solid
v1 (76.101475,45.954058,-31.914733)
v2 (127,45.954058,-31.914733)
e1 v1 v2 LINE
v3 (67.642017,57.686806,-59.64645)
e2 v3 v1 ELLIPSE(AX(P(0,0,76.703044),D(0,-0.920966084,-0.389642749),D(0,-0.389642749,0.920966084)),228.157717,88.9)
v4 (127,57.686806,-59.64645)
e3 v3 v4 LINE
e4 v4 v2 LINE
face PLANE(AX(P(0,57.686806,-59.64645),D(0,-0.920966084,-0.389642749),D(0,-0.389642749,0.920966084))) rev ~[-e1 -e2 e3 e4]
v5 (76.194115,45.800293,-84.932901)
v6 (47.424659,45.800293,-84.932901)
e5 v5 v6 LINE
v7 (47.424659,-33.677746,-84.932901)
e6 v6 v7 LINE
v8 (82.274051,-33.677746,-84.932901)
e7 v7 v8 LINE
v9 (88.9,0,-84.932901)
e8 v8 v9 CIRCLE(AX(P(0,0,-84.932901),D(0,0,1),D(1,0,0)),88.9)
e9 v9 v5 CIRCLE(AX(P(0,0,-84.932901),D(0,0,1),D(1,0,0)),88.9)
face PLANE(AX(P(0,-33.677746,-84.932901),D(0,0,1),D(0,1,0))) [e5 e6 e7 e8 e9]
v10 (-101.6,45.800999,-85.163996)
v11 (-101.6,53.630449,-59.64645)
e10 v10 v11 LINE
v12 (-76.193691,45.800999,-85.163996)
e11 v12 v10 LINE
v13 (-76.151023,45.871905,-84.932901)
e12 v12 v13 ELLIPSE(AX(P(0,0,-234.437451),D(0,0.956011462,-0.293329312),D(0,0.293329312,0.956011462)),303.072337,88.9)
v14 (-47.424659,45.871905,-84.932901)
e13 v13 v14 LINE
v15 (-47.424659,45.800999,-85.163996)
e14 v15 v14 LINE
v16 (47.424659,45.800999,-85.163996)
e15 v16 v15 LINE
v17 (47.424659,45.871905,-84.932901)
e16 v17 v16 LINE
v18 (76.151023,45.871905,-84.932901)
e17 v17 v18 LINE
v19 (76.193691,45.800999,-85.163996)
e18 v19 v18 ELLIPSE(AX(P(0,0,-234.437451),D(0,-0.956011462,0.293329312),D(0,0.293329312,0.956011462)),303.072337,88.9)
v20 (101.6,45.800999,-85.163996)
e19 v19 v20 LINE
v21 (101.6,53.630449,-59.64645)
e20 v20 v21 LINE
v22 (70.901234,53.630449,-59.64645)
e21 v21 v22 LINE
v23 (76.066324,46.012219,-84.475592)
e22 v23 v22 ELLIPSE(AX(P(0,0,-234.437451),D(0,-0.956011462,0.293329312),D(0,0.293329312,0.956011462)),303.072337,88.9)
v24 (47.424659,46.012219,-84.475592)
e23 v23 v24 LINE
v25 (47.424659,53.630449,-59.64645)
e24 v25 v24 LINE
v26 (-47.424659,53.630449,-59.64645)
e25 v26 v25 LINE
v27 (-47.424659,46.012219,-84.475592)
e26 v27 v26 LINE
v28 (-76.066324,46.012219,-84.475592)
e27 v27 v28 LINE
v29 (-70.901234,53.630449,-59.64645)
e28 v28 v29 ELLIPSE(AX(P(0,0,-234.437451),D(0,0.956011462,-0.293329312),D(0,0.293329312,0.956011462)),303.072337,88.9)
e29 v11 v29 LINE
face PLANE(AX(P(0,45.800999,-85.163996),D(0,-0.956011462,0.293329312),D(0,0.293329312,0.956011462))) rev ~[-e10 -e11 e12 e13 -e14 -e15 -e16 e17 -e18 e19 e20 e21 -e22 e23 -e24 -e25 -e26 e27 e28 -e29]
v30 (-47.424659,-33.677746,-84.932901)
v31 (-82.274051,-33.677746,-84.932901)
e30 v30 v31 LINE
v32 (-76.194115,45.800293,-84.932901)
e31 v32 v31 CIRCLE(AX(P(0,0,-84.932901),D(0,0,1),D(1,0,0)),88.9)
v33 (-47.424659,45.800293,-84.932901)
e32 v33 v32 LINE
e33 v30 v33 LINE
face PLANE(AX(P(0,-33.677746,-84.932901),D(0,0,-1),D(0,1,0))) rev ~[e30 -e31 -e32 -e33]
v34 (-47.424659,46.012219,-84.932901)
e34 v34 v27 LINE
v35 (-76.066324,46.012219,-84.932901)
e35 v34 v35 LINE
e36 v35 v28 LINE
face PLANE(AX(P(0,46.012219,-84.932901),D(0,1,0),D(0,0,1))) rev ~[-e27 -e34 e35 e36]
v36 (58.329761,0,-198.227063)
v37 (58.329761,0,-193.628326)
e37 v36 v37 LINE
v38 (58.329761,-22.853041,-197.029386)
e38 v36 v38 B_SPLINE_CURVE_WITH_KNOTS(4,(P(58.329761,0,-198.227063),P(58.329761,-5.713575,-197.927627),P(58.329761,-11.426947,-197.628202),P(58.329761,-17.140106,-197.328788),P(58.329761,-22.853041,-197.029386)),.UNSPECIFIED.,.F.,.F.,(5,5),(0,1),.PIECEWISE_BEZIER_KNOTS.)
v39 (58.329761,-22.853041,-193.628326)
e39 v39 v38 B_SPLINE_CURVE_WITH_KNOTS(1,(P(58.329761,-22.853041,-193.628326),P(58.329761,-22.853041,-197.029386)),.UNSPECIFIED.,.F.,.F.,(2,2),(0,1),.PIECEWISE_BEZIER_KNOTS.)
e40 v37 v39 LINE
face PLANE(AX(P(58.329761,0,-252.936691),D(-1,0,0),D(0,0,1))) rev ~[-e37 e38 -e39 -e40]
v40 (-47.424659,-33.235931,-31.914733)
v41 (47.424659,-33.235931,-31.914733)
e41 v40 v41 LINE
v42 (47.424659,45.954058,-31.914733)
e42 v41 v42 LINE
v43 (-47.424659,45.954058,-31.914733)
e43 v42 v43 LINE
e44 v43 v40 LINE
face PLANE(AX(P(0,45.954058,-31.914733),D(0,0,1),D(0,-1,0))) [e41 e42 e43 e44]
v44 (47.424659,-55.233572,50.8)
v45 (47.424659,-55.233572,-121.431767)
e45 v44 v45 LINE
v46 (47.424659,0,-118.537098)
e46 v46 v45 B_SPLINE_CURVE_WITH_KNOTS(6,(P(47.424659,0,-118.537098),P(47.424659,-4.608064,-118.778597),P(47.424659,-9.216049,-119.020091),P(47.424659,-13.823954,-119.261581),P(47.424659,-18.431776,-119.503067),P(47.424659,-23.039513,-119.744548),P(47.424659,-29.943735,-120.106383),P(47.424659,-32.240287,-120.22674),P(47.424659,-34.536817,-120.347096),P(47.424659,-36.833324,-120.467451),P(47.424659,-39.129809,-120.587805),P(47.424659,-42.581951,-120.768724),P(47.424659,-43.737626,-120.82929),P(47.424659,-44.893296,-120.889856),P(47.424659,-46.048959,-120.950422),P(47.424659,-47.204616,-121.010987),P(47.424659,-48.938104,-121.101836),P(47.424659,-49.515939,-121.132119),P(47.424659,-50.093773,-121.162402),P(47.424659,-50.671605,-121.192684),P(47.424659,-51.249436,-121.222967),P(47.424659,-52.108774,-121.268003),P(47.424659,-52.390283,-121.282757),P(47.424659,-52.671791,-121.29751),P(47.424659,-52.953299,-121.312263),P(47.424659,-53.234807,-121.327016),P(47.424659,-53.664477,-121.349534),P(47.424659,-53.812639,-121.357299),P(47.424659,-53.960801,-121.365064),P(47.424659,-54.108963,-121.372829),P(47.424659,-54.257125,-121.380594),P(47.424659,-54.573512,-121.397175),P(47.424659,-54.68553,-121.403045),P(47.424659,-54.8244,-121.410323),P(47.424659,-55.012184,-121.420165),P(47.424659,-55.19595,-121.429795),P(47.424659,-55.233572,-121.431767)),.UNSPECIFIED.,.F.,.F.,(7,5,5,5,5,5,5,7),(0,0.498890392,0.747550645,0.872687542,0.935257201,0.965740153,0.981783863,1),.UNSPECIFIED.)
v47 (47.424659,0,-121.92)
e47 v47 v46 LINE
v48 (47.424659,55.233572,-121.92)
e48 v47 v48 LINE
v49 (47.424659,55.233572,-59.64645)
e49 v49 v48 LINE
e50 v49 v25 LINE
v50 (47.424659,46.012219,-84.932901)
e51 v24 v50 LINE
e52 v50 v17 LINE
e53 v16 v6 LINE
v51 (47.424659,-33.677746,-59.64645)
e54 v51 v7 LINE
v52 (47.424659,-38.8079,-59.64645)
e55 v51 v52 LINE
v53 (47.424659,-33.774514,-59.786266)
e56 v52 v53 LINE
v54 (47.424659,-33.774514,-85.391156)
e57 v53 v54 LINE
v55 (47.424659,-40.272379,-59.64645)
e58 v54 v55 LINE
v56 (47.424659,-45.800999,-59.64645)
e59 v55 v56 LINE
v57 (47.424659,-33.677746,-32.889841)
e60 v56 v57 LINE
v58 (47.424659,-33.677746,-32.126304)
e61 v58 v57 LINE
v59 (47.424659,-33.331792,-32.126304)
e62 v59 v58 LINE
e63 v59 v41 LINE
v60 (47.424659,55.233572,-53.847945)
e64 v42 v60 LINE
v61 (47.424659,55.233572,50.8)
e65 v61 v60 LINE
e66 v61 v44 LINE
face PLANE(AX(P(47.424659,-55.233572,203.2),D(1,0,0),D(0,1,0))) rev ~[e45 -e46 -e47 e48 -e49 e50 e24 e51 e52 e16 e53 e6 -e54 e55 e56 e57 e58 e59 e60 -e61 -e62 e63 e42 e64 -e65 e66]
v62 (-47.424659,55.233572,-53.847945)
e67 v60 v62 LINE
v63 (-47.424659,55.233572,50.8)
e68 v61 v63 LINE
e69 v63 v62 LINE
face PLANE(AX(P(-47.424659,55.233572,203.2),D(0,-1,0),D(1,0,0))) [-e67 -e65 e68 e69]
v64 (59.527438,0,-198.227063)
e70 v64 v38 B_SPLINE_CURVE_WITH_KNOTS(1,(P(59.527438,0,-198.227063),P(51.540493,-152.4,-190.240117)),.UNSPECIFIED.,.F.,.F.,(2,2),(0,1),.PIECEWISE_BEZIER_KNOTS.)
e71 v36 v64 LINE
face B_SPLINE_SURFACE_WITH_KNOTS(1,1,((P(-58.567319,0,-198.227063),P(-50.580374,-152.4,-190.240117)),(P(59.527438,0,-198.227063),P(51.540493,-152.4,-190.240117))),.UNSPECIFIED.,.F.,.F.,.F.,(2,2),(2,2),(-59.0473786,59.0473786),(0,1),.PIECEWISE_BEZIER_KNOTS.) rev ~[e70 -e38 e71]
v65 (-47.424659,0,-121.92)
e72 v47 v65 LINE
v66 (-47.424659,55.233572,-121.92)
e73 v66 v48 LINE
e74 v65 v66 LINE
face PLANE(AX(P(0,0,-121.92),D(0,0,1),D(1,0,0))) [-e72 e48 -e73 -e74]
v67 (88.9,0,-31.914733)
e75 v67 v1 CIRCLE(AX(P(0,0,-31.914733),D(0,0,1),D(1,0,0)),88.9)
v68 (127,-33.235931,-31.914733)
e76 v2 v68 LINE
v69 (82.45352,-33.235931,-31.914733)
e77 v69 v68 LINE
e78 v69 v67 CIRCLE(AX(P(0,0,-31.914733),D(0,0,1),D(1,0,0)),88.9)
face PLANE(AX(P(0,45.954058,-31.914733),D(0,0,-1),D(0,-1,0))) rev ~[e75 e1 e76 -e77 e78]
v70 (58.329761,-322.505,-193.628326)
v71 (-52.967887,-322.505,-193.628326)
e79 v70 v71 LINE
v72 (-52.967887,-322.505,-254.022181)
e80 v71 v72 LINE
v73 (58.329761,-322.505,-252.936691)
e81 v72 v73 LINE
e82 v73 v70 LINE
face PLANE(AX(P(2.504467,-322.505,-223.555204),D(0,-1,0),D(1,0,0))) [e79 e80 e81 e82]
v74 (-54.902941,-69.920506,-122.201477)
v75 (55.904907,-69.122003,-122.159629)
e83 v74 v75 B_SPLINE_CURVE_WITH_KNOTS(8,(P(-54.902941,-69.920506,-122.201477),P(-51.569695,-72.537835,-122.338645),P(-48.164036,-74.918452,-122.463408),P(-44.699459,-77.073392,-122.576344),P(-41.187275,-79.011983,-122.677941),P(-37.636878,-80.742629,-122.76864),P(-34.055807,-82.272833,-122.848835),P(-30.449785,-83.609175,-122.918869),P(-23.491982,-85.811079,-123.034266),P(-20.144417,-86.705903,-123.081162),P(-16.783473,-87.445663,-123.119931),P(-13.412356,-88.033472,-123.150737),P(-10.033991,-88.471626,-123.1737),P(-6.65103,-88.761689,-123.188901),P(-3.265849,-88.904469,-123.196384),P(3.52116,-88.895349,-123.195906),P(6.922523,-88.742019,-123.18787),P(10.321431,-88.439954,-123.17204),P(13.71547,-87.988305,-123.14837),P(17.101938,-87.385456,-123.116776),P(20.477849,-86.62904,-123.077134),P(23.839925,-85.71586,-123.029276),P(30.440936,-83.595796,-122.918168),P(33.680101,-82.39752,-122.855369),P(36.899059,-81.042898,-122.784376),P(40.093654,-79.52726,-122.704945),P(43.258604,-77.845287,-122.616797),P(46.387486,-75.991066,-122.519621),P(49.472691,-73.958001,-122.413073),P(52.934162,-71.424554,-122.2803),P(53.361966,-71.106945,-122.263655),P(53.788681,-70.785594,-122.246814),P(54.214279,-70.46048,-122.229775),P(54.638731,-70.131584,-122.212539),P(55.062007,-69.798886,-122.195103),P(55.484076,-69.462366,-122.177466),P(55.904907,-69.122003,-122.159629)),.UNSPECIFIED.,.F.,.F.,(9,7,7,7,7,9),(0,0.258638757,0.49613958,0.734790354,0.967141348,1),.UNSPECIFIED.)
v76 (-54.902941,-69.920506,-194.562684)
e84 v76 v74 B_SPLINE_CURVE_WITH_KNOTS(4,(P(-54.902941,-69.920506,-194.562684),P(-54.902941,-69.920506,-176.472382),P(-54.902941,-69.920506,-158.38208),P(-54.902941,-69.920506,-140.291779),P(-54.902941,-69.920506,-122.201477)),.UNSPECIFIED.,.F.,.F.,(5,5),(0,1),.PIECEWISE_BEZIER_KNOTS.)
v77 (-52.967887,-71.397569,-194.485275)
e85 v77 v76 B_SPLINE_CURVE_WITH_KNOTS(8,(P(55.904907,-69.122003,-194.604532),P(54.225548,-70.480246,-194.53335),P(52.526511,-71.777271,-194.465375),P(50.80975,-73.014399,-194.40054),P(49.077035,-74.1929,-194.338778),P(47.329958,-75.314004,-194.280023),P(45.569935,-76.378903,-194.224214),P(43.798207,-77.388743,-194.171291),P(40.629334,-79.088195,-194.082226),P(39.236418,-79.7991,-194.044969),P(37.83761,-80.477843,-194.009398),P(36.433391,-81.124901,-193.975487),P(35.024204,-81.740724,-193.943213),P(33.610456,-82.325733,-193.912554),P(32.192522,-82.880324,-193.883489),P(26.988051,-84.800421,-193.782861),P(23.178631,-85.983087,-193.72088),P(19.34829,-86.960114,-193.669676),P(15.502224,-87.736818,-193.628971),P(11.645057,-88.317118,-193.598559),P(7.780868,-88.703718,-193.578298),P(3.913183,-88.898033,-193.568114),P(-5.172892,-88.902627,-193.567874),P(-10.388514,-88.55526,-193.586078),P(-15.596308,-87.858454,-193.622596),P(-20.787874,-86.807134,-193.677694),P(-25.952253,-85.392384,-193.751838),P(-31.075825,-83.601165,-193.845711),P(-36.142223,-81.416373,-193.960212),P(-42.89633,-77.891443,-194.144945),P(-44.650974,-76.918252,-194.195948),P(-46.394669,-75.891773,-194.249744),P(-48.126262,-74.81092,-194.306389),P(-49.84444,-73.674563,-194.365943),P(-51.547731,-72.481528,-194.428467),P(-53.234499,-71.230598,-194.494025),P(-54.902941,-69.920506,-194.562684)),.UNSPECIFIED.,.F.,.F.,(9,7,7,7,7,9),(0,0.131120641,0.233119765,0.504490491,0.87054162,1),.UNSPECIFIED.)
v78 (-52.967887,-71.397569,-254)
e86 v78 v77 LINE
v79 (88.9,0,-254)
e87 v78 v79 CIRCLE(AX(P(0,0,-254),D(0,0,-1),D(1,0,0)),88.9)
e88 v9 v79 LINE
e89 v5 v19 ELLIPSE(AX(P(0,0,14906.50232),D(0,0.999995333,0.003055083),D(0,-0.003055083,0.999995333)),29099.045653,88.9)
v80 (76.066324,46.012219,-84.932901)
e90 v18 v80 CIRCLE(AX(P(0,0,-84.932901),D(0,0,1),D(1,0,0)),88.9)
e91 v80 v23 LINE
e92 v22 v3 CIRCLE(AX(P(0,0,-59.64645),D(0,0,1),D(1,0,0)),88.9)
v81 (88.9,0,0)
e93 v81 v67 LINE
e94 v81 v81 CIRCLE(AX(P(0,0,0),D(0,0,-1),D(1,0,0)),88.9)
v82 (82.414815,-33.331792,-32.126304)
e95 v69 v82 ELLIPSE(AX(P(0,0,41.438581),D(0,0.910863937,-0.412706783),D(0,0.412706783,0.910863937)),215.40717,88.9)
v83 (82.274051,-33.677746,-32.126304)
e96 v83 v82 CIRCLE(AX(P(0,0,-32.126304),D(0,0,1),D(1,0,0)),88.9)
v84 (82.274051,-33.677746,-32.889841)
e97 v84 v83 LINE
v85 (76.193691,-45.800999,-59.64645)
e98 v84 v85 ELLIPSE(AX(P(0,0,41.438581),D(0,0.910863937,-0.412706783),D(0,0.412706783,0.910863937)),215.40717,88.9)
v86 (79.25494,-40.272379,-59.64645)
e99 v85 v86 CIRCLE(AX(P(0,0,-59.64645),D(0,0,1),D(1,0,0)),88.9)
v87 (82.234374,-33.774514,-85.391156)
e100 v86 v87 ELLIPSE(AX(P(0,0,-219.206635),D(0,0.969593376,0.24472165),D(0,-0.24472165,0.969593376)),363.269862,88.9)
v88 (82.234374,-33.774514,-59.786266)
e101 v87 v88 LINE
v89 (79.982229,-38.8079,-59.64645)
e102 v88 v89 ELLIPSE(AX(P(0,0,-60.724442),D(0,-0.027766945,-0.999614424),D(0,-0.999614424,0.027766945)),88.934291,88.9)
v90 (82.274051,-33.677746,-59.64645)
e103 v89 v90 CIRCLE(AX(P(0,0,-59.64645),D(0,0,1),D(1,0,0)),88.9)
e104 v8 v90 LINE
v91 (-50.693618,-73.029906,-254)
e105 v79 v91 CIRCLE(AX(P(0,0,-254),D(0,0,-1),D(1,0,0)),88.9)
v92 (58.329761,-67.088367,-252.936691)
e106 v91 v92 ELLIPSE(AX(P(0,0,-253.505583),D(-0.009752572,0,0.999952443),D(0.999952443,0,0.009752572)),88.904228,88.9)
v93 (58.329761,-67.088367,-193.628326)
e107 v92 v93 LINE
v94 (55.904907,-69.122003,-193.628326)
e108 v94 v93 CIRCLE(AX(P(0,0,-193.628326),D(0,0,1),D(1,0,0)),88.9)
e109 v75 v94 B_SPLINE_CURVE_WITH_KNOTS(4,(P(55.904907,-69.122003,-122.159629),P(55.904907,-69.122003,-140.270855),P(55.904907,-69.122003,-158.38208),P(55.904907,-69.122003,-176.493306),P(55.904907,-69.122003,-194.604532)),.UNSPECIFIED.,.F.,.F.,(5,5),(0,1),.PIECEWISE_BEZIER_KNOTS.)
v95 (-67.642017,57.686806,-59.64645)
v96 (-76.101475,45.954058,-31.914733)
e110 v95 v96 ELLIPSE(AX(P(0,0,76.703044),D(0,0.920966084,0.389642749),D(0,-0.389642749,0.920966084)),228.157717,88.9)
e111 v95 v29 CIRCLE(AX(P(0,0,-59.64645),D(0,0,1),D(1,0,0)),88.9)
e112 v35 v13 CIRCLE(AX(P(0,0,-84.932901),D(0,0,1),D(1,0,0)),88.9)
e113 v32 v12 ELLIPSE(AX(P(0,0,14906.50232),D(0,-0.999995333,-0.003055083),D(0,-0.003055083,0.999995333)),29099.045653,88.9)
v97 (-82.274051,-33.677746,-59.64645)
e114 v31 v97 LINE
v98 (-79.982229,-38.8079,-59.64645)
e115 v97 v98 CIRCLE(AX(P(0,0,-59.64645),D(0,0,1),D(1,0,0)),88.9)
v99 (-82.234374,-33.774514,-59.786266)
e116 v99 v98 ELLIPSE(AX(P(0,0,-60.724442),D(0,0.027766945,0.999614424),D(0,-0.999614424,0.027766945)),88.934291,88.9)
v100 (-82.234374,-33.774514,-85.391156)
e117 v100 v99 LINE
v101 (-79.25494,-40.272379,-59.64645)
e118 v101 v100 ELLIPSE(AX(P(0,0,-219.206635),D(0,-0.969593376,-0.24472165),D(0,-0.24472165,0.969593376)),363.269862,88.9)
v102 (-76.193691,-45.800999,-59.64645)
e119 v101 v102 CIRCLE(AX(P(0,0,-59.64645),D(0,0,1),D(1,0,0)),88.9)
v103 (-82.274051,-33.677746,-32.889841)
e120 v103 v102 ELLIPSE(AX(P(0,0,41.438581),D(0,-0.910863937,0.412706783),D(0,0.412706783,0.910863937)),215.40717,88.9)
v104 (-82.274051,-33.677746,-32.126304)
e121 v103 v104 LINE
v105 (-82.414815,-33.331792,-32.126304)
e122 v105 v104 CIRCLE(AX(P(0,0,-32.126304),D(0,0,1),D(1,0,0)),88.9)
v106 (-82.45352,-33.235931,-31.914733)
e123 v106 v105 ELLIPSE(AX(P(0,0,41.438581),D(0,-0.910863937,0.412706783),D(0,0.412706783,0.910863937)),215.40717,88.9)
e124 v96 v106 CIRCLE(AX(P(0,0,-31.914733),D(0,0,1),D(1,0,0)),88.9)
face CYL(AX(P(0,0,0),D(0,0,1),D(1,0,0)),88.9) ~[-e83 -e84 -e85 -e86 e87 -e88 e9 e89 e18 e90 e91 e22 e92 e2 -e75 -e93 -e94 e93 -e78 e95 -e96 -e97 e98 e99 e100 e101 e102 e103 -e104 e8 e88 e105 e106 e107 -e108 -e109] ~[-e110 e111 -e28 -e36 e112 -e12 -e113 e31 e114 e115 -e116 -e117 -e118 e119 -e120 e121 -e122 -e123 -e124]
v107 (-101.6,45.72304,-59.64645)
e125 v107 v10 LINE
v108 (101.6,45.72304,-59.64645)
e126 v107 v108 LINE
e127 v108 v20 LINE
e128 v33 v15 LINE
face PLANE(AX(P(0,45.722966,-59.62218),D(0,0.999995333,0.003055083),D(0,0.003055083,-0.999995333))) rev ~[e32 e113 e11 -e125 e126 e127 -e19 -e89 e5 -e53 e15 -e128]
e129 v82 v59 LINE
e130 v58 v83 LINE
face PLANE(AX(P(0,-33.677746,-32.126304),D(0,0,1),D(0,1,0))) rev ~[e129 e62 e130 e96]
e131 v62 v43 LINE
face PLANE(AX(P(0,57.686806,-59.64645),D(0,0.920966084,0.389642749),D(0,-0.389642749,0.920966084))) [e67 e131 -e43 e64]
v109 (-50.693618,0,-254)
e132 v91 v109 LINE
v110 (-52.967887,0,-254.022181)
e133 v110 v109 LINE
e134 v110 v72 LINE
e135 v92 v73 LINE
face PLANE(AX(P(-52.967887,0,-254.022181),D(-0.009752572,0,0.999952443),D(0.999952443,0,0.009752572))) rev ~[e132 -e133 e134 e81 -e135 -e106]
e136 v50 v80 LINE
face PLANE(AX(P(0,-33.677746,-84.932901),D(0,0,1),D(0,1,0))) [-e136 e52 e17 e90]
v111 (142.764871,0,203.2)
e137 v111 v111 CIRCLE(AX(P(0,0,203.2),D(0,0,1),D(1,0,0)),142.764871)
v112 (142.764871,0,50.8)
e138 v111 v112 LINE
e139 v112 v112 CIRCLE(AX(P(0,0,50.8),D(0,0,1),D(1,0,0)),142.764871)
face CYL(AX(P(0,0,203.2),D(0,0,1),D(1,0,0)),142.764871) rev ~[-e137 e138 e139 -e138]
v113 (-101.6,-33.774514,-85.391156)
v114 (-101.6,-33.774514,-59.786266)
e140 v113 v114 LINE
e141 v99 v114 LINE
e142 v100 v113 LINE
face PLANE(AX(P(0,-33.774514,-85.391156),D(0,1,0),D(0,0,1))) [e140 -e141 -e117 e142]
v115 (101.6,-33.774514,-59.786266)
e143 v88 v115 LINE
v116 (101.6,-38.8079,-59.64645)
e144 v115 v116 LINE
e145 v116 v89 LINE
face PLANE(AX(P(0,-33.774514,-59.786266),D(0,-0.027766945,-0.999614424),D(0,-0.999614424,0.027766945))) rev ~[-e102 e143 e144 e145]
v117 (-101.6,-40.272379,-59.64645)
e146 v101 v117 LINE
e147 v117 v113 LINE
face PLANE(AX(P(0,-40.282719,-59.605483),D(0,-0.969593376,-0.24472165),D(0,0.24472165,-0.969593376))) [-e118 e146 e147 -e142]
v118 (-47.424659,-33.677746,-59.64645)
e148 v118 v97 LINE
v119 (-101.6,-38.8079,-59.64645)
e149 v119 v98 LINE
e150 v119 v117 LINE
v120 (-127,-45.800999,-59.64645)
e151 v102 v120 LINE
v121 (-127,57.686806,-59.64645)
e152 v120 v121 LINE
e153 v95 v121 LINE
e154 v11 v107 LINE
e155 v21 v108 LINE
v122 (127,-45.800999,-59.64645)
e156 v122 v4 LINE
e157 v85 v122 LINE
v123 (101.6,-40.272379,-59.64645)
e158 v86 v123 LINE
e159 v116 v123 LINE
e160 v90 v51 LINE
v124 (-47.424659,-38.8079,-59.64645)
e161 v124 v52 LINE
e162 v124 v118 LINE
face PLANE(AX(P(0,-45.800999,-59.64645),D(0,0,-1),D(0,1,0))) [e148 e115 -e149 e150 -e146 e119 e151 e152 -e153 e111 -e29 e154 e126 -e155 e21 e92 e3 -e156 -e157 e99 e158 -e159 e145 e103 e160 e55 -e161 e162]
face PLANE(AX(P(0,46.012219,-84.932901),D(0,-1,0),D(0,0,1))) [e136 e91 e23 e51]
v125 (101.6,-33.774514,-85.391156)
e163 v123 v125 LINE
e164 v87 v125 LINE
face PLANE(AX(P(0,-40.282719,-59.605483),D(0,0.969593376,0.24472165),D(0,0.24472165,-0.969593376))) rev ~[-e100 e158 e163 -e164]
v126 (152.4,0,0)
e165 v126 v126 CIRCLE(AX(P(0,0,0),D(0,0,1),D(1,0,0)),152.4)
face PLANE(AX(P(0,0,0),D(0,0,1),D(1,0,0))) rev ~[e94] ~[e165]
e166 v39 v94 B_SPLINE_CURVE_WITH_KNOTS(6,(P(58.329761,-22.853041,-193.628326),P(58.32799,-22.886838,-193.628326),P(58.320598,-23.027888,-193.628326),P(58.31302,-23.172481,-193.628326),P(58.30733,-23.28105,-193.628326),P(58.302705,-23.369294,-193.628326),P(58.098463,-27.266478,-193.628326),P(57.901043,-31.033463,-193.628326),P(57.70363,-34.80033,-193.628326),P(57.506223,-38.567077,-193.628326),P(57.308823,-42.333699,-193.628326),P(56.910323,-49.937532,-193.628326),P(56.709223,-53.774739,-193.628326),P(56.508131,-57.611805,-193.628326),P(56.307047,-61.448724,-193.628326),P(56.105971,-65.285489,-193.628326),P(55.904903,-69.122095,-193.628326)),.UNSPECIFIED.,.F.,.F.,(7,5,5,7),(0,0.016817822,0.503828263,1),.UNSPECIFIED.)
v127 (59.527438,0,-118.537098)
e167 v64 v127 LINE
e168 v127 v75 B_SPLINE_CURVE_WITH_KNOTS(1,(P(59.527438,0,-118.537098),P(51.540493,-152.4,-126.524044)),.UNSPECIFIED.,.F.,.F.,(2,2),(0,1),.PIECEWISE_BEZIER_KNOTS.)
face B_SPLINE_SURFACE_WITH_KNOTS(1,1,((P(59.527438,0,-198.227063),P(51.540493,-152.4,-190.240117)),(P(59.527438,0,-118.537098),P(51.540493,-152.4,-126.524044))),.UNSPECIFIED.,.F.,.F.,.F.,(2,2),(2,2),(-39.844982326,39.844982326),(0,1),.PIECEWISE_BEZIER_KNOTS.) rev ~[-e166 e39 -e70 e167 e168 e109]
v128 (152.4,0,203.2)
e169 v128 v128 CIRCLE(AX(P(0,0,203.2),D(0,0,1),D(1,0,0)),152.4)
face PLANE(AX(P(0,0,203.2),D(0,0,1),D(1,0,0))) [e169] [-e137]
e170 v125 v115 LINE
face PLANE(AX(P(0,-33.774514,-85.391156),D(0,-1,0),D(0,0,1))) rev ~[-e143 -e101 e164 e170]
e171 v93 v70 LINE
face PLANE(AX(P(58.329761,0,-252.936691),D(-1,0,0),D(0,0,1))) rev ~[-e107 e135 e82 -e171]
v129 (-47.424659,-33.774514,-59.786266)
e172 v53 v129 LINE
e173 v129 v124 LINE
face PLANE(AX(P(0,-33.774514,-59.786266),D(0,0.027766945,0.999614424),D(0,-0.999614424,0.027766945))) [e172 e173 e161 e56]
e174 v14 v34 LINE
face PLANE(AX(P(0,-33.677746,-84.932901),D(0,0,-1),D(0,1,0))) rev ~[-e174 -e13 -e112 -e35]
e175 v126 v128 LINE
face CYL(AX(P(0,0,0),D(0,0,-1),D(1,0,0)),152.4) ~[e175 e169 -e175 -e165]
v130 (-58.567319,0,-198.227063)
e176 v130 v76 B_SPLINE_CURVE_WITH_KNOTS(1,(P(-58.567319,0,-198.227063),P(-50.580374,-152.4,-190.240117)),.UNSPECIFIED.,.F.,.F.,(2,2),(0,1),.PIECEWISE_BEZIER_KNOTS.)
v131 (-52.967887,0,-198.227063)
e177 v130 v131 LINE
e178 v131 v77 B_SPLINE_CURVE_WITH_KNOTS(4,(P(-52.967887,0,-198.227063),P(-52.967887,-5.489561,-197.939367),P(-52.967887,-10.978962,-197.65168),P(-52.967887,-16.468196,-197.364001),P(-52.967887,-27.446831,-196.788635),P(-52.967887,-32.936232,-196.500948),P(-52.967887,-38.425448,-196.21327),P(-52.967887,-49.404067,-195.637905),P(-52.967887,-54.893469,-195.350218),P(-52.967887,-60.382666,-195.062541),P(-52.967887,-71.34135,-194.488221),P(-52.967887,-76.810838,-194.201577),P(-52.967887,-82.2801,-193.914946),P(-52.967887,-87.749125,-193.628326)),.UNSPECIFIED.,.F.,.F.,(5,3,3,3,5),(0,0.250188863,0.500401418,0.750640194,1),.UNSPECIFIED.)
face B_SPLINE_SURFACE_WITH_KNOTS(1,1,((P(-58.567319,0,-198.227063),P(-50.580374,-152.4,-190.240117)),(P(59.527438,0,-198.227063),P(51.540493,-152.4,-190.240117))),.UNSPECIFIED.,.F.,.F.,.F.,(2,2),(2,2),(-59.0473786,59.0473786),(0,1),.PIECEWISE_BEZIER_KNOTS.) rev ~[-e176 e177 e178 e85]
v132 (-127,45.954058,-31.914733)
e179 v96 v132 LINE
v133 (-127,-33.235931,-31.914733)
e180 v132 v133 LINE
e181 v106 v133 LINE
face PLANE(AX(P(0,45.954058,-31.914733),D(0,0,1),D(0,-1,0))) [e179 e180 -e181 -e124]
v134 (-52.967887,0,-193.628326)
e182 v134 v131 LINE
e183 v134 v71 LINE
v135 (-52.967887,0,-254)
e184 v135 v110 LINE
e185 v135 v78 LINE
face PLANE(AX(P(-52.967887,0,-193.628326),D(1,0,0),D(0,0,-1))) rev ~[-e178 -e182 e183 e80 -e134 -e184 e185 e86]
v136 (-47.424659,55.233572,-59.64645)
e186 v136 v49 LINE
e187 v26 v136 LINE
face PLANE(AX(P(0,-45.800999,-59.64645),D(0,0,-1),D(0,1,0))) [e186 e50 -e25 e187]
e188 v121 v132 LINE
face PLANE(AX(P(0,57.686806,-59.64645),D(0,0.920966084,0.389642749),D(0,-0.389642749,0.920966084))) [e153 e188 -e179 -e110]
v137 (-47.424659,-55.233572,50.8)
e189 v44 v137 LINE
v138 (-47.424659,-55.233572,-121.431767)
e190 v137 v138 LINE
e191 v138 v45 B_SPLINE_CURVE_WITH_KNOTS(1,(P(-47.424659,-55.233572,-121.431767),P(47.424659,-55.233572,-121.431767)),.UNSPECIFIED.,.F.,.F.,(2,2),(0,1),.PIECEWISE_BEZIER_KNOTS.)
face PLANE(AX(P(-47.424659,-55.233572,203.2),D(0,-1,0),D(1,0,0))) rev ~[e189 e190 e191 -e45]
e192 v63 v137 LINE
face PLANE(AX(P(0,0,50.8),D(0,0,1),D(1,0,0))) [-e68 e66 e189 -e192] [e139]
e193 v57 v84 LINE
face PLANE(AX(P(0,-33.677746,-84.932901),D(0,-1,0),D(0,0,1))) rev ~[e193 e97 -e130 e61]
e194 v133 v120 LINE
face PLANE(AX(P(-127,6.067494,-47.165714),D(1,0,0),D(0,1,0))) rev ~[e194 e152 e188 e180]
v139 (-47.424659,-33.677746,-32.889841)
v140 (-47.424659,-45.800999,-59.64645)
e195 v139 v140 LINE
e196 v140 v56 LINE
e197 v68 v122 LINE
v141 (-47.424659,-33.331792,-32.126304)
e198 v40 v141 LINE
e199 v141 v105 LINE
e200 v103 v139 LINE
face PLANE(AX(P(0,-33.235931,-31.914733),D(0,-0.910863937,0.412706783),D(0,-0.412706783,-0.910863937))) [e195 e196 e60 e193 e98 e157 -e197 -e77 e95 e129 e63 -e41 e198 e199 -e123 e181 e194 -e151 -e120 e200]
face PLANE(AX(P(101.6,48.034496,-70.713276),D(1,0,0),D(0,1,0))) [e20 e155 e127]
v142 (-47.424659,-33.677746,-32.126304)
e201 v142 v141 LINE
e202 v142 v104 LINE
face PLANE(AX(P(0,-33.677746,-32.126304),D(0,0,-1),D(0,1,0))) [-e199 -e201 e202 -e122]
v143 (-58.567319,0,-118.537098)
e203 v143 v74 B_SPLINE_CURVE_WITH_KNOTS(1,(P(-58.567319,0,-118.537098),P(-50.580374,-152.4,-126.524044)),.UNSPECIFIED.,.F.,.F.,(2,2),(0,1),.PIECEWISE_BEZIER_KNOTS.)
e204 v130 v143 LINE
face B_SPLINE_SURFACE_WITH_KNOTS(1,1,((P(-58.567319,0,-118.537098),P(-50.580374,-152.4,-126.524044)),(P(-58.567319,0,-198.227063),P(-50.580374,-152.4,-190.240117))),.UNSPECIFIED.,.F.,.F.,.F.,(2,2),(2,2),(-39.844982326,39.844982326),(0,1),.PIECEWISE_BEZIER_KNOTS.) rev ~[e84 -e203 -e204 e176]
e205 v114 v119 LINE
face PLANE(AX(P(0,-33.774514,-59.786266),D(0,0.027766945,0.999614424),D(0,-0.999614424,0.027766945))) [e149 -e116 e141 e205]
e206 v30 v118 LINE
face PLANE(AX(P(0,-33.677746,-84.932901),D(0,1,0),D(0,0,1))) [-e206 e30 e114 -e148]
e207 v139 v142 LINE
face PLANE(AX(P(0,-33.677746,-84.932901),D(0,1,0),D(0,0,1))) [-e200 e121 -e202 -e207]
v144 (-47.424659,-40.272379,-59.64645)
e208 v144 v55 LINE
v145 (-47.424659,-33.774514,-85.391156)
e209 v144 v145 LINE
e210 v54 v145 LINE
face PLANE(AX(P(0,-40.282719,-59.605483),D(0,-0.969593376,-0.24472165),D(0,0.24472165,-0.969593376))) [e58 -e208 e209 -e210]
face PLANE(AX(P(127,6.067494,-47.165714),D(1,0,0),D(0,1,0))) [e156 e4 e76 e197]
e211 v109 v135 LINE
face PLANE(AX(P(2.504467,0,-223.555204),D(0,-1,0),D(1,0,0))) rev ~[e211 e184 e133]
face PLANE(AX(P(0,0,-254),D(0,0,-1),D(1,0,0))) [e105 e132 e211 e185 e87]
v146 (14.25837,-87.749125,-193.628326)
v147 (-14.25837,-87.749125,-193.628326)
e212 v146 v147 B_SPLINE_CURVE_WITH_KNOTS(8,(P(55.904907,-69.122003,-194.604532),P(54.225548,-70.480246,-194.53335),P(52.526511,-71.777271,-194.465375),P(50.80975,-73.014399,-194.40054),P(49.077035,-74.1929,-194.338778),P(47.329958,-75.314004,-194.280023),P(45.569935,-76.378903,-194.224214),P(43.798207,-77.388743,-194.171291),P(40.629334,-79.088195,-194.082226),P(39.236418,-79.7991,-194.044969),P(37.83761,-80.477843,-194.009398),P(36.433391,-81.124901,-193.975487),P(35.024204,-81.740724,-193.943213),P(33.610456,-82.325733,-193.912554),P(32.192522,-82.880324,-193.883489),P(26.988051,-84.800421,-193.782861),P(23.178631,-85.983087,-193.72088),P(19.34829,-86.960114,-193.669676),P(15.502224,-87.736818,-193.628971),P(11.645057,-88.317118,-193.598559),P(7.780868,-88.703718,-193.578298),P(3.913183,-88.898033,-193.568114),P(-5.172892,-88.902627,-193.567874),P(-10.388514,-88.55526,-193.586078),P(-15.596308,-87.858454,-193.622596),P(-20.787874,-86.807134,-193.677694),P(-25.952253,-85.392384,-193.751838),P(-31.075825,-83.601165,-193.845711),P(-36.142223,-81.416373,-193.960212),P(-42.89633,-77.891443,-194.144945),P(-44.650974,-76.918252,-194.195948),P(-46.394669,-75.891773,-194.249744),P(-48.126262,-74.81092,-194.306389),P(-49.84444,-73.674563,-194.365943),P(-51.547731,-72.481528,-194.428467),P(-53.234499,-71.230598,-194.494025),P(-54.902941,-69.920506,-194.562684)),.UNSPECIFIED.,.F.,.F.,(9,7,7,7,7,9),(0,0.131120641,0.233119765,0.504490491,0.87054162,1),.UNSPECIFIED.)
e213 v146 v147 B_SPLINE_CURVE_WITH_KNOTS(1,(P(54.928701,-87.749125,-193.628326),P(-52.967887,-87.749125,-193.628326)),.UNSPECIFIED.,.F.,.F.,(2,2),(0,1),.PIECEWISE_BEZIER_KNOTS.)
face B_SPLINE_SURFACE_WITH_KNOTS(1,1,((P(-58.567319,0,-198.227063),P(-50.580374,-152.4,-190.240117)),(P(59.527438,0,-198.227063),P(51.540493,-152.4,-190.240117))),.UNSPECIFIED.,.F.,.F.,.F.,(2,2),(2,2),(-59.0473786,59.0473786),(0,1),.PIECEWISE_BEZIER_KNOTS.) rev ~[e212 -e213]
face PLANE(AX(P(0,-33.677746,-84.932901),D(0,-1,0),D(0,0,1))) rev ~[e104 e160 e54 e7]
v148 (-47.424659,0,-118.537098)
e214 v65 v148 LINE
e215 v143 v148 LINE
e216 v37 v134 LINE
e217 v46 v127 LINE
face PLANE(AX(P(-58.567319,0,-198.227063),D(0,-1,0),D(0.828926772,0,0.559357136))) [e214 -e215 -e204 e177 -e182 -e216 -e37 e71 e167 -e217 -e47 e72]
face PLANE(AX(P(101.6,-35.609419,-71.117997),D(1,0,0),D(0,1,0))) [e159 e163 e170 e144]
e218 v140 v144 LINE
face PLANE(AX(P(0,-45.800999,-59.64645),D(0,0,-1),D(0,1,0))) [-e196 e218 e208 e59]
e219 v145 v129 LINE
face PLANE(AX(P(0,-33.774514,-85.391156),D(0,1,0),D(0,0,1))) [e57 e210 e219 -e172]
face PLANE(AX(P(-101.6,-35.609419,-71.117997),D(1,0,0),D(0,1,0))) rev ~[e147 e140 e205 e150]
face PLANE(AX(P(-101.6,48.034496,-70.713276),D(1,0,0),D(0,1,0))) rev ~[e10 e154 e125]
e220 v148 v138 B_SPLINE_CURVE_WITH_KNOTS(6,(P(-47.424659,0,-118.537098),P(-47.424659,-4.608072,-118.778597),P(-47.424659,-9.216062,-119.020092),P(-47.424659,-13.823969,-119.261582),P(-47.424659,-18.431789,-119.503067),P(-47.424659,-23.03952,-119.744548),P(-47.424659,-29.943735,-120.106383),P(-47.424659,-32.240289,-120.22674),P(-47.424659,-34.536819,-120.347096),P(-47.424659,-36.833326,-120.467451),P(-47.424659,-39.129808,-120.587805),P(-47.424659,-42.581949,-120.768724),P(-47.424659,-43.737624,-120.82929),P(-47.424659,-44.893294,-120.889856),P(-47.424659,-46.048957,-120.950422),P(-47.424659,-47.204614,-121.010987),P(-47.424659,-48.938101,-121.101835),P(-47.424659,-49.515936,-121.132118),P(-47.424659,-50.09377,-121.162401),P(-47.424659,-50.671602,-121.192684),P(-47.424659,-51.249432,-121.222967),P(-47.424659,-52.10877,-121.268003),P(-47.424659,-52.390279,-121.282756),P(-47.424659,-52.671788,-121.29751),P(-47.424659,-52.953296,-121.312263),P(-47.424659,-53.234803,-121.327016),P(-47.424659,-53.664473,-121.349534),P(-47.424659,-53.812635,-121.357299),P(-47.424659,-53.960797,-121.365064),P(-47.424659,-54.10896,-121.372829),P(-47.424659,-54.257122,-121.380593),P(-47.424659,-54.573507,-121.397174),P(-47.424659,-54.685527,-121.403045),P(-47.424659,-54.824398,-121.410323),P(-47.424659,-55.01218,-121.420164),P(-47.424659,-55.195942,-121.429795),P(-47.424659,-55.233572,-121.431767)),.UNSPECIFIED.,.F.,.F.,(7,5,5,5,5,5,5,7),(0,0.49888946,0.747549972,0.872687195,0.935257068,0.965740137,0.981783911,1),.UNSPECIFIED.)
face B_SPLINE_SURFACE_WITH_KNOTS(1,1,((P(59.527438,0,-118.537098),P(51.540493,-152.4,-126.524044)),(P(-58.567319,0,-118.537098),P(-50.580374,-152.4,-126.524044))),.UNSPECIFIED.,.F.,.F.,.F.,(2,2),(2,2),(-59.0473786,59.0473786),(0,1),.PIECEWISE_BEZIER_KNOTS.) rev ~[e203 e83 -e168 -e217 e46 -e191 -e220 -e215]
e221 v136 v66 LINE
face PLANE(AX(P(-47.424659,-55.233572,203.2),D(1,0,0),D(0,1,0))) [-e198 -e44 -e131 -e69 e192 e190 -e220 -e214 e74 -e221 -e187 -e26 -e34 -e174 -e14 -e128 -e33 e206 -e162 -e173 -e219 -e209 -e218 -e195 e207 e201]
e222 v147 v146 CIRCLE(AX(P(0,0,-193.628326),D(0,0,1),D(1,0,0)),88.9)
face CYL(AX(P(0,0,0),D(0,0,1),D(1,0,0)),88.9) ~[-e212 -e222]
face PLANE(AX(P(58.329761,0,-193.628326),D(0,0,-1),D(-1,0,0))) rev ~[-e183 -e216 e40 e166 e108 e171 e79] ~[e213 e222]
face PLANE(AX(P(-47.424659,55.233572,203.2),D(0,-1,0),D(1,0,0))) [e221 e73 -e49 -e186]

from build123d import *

# Parameters (mm, degrees)
F0_R           = 152.4
F1_DEPTH       = 203.2
F2_R           = 88.9
F3_DEPTH       = 254
F4_W           = 118.0947571993
F4_H           = 79.6899646521
F5_DEPTH       = 152.4
F5_TAPER       = 3
F6_W           = 94.8493182659
F6_H           = 110.4671433568
F7_DEPTH       = 325.12
F8_R           = 142.764871417
F9_DEPTH       = 152.4
F10_W          = 79.6899646521
F10_H          = 52.806597203
F11_DEPTH      = 101.6
F11_DEPTH_BACK = 101.6
F13_DEPTH      = 127
F13_DEPTH_BACK = 127
F15_DEPTH      = 101.6
F15_DEPTH_BACK = 101.6
F17_DEPTH      = 322.505


with BuildPart() as f1:
    # F0 (on Top) → F1 (new body)
    with BuildSketch(Plane.XY):
        Circle(F0_R)
    extrude(amount=F1_DEPTH)

    # F2 (on face) → F3 (join)
    with BuildSketch(Plane(origin=(0, 0, 0), x_dir=(1, 0, 0), z_dir=(0, 0, -1))):
        Circle(F2_R)
    extrude(amount=F3_DEPTH)

    # F4 (on Front) → F5 (cut)
    with BuildSketch(Plane.XZ):
        with Locations((0.4800595343, -158.3820804954)):
            Rectangle(F4_W, F4_H)
    extrude(amount=F5_DEPTH, taper=F5_TAPER, mode=Mode.SUBTRACT)

    # F6 (on face) → F7 (cut)
    with BuildSketch(Plane.XY.offset(203.2)):
        Rectangle(F6_W, F6_H)
    extrude(amount=-F7_DEPTH, mode=Mode.SUBTRACT)

    # F8 (on face) → F9 (cut)
    with BuildSketch(Plane.XY.offset(203.2)):
        Circle(F8_R)
    extrude(amount=-F9_DEPTH, mode=Mode.SUBTRACT)

    # F10 (on Right) → F11 (cut, two sides)
    with BuildSketch(Plane.YZ) as f11_sk:
        with Locations((6.1672367156, -58.5296023637)):
            Rectangle(F10_W, F10_H)
    extrude(amount=F11_DEPTH, mode=Mode.SUBTRACT)
    extrude(f11_sk.sketch, amount=-F11_DEPTH_BACK, mode=Mode.SUBTRACT)

    # F12 (on Right) → F13 (join, two sides)
    with BuildSketch(Plane.YZ) as f13_sk:
        Polygon((45.9540584598, -31.9147333503), (-33.2359305319, -31.9147333503), (-45.800998807, -59.6464499831), (57.6868057251, -59.6464499831), align=None)
    extrude(amount=F13_DEPTH)
    extrude(f13_sk.sketch, amount=-F13_DEPTH_BACK)

    # F14 (on Right) → F15 (join, two sides)
    with BuildSketch(Plane.YZ) as f15_sk:
        Polygon((-33.7745137513, -59.7862656422), (-40.2827188373, -59.6054829657), (-33.7745137513, -85.3911563754), align=None)
        Polygon((53.6378957331, -59.6221797168), (45.722966075, -59.6221797168), (45.800998807, -85.1639956236), align=None)
    extrude(amount=F15_DEPTH)
    extrude(f15_sk.sketch, amount=-F15_DEPTH_BACK)

    # F16 (on Front) → F17 (join)
    with BuildSketch(Plane.XZ):
        Polygon((58.3297610283, -193.6283260584), (-52.9678873718, -193.6283260584), (-52.9678873718, -254.0221810341), (58.3297610283, -252.9366910458), align=None)
    extrude(amount=F17_DEPTH)


solid = f1.part
